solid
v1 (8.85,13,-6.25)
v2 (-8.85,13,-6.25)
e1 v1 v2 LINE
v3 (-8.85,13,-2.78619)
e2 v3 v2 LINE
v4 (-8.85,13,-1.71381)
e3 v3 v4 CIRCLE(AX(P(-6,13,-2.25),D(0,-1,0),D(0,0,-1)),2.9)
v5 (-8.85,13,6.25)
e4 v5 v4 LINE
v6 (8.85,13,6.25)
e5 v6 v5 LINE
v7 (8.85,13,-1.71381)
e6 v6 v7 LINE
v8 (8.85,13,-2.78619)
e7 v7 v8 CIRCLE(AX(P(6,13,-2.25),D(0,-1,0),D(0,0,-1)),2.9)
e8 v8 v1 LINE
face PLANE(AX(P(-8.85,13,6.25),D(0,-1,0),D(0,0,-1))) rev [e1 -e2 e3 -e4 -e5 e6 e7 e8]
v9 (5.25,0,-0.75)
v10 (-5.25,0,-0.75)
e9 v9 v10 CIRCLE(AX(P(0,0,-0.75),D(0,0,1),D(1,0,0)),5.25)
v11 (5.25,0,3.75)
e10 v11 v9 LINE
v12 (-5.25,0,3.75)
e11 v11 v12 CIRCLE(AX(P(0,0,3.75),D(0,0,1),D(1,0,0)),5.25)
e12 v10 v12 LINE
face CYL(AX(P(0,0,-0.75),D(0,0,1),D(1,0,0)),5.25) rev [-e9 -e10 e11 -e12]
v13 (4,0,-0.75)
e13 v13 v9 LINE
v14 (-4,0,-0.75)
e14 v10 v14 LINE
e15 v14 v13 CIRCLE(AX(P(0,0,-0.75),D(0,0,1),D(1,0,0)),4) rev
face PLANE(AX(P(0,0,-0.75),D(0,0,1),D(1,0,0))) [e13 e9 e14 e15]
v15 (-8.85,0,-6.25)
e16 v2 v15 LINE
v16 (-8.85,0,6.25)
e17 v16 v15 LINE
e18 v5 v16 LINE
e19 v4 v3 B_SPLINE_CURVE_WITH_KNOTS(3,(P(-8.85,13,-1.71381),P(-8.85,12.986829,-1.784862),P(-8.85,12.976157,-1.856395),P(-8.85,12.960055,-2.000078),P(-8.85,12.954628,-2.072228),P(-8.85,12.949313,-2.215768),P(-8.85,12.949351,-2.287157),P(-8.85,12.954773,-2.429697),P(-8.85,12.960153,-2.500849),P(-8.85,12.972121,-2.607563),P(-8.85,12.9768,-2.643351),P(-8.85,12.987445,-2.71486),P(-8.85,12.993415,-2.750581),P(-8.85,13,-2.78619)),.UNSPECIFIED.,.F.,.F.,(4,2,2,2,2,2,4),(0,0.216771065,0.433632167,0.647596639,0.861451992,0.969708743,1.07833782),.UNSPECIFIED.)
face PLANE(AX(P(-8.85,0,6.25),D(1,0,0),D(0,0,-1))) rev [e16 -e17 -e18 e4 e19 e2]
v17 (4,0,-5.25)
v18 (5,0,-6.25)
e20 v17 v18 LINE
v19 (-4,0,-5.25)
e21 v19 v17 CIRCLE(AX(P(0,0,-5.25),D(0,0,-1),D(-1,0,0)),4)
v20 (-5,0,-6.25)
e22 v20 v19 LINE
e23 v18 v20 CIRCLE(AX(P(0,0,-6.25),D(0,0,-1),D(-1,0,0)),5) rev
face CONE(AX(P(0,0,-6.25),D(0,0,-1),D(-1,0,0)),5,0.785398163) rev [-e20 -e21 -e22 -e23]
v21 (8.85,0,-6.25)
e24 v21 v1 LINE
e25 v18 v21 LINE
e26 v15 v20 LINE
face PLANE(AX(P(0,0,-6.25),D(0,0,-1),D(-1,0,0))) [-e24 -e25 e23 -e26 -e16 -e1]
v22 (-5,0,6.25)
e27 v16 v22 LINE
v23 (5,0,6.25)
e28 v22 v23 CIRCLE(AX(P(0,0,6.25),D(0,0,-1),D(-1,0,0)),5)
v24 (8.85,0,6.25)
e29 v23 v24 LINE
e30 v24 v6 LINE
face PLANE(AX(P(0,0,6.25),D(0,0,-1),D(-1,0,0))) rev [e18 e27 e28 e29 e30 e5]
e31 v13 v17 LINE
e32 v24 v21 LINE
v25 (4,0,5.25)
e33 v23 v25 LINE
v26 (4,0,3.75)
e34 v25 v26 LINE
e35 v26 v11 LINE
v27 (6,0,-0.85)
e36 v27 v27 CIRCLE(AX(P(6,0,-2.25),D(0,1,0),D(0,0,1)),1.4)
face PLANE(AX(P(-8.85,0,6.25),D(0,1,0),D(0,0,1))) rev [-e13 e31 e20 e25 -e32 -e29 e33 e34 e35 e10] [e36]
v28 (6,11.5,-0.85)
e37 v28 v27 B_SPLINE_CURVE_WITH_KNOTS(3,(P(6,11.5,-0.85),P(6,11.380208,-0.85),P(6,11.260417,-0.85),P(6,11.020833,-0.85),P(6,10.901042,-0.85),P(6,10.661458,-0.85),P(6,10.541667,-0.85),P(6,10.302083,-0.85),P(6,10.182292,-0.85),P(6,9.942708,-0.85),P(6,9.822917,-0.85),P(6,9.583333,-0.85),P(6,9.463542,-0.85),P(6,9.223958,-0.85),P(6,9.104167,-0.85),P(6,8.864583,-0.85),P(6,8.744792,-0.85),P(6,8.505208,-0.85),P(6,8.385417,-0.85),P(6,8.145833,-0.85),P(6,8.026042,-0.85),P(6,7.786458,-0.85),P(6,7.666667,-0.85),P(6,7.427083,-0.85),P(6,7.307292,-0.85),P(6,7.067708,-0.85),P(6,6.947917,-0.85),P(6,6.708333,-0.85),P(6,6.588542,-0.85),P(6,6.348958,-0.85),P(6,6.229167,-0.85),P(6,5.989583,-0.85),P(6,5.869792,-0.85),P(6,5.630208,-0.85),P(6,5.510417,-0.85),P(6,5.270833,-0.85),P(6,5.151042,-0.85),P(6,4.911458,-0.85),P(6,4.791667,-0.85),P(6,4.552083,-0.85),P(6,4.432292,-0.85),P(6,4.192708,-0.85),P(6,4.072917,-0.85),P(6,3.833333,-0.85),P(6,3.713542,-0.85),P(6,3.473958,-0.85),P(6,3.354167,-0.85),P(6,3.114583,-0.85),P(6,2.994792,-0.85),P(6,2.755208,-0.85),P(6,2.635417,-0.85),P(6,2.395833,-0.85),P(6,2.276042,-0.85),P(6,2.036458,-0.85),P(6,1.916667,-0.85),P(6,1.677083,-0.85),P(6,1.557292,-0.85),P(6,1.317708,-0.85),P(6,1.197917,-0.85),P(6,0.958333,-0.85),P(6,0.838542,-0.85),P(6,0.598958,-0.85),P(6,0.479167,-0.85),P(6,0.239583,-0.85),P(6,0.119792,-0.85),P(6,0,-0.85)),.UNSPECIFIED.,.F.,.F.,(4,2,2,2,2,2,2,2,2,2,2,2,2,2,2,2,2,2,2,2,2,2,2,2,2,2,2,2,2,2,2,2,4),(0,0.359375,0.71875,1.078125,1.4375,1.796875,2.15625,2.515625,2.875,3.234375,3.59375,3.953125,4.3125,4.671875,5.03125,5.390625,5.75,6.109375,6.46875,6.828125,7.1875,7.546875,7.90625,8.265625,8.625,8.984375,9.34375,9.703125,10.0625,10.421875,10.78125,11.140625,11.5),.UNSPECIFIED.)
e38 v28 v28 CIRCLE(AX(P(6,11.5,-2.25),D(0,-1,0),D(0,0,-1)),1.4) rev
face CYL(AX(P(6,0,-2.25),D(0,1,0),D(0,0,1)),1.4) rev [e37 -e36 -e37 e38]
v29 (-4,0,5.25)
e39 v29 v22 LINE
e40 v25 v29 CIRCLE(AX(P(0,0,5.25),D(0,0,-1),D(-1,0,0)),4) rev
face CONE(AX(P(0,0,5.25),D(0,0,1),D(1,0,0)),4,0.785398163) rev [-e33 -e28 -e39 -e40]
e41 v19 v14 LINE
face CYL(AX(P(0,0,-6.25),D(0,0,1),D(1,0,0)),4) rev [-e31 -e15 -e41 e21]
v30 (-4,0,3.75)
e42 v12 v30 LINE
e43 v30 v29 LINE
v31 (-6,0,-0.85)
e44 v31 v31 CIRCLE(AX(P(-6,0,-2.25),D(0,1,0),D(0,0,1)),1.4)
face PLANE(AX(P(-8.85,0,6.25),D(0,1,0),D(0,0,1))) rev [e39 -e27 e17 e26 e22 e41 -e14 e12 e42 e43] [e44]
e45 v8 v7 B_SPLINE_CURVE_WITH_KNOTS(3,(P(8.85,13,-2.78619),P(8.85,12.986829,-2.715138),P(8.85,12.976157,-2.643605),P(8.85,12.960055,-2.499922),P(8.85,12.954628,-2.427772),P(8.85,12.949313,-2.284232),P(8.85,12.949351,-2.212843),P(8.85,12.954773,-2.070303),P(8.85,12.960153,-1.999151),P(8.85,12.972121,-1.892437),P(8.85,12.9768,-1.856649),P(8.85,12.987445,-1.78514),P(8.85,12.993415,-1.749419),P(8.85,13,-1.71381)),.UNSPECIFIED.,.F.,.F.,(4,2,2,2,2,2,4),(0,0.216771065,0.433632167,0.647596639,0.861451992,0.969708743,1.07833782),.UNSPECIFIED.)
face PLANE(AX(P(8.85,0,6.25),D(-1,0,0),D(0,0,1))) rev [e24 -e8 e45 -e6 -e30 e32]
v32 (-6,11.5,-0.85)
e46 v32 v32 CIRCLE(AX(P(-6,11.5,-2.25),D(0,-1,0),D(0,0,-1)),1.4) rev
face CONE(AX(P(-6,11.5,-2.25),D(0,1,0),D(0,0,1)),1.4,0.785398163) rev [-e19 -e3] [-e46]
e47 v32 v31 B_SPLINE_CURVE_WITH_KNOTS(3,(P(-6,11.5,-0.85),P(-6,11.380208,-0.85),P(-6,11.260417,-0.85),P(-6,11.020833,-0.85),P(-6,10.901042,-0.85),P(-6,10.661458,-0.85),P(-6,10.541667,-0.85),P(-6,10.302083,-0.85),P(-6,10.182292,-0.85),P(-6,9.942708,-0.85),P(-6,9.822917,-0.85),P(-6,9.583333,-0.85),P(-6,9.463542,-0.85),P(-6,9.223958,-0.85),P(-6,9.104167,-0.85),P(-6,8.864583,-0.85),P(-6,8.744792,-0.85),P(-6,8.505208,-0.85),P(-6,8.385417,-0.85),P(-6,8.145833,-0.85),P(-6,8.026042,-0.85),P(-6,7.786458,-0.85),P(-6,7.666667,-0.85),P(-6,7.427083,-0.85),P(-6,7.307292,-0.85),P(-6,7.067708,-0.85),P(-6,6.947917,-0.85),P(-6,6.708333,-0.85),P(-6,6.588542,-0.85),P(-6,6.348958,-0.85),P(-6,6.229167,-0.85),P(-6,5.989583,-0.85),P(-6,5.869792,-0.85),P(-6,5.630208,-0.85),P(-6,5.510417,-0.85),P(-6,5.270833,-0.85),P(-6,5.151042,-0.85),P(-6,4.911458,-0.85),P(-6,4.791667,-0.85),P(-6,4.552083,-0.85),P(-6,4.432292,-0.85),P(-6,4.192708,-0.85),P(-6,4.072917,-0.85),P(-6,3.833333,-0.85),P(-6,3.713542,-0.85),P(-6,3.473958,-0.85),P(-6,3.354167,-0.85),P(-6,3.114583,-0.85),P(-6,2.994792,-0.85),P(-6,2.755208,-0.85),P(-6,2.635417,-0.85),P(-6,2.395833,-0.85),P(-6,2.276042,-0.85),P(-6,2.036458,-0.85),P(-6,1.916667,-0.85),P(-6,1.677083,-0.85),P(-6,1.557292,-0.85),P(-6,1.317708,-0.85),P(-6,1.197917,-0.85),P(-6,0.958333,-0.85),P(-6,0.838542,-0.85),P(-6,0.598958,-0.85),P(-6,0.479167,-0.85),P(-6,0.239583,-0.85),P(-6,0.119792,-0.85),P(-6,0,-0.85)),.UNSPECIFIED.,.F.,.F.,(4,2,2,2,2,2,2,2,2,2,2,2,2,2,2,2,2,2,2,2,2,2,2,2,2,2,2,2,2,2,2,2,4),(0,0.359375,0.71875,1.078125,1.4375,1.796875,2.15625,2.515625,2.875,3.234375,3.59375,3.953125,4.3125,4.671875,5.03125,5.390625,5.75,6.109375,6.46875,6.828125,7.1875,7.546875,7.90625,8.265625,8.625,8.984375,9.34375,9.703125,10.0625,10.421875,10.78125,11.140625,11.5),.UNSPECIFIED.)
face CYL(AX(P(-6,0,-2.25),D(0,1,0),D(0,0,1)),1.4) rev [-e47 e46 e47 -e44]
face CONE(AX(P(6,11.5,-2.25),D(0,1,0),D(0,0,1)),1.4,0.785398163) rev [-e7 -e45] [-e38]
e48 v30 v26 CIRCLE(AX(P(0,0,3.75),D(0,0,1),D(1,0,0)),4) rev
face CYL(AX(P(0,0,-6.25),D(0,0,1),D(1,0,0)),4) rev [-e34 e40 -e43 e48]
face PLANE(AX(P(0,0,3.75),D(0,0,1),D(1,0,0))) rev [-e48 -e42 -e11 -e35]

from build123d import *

# Parameters (mm, degrees)
SKETCH_2_W            = 17.7
SKETCH_2_H            = 13
EXTRUDE_380_DEPTH     = 6.25
SKETCH_3_R            = 4
CUT_EXTRUDE_527_DEPTH = 21.089113968
CUT_EXTRUDE_START     = -2.5
SKETCH_4_R            = 5.25
CUT_EXTRUDE_676_DEPTH = 4.5
SKETCH_5_R            = 1.4
CUT_EXTRUDE_872_DEPTH = 17.922913461
CHAMFER_2_SIZE        = 1
CHAMFER_3_SIZE        = 1.5


with BuildPart() as part:
    # Эскиз2 → Extrude 380 (new, symmetric)
    with BuildSketch(Plane.XY):
        with Locations((0, 6.5)):
            Rectangle(SKETCH_2_W, SKETCH_2_H)
    extrude(amount=EXTRUDE_380_DEPTH, both=True)

    # Эскиз3 → Cut-Extrude 527 (cut, through all)
    with BuildSketch(Plane.XY.offset(6.25)):
        Circle(SKETCH_3_R)
    extrude(amount=-CUT_EXTRUDE_527_DEPTH, mode=Mode.SUBTRACT)

    # Эскиз4 → Cut-Extrude 676 (cut)
    with BuildSketch(Plane.XY.offset(6.25).offset(CUT_EXTRUDE_START)):
        Circle(SKETCH_4_R)
    extrude(amount=-CUT_EXTRUDE_676_DEPTH, mode=Mode.SUBTRACT)

    # Эскиз5 → Cut-Extrude 872 (cut, through all)
    with BuildSketch(Plane(origin=(0, 13, 0), x_dir=(1, 0, 0), z_dir=(0, 1, 0))):
        with Locations(Location((-6, 2.25, 0), (0, 0, 270))):
            Circle(SKETCH_5_R)
        with Locations(Location((6, 2.25, 0), (0, 0, 270))):
            Circle(SKETCH_5_R)
    extrude(amount=-CUT_EXTRUDE_872_DEPTH, mode=Mode.SUBTRACT)

    # Фаска2
    chamfer_2_edges = [part.edges().sort_by_distance(p)[0] for p in [
        (0, 4, 6.25),
        (0, 4, -6.25),
    ]]
    chamfer(chamfer_2_edges, length=CHAMFER_2_SIZE)

    # Фаска3
    # the kernel refuses this chamfer: 1.5 mm, written as the material it takes off along each edge
    with BuildSketch(Plane(origin=(-6, 13, -2.25), x_dir=(0, 0, 1), z_dir=(-1, 0, 0))) as chamfer_3_piece_1:
        Polygon((1.4 + CHAMFER_3_SIZE, 0), (1.4, -CHAMFER_3_SIZE), (1.4, 0), align=None)
    revolve(axis=Axis((-6, 13, -2.25), (0, 1, 0)), mode=Mode.SUBTRACT)
    with BuildSketch(Plane(origin=(6, 13, -2.25), x_dir=(0, 0, 1), z_dir=(-1, 0, 0))) as chamfer_3_piece_2:
        Polygon((1.4, -CHAMFER_3_SIZE), (1.4 + CHAMFER_3_SIZE, 0), (1.4, 0), align=None)
    revolve(axis=Axis((6, 13, -2.25), (0, 1, 0)), mode=Mode.SUBTRACT)


solid = part.part
